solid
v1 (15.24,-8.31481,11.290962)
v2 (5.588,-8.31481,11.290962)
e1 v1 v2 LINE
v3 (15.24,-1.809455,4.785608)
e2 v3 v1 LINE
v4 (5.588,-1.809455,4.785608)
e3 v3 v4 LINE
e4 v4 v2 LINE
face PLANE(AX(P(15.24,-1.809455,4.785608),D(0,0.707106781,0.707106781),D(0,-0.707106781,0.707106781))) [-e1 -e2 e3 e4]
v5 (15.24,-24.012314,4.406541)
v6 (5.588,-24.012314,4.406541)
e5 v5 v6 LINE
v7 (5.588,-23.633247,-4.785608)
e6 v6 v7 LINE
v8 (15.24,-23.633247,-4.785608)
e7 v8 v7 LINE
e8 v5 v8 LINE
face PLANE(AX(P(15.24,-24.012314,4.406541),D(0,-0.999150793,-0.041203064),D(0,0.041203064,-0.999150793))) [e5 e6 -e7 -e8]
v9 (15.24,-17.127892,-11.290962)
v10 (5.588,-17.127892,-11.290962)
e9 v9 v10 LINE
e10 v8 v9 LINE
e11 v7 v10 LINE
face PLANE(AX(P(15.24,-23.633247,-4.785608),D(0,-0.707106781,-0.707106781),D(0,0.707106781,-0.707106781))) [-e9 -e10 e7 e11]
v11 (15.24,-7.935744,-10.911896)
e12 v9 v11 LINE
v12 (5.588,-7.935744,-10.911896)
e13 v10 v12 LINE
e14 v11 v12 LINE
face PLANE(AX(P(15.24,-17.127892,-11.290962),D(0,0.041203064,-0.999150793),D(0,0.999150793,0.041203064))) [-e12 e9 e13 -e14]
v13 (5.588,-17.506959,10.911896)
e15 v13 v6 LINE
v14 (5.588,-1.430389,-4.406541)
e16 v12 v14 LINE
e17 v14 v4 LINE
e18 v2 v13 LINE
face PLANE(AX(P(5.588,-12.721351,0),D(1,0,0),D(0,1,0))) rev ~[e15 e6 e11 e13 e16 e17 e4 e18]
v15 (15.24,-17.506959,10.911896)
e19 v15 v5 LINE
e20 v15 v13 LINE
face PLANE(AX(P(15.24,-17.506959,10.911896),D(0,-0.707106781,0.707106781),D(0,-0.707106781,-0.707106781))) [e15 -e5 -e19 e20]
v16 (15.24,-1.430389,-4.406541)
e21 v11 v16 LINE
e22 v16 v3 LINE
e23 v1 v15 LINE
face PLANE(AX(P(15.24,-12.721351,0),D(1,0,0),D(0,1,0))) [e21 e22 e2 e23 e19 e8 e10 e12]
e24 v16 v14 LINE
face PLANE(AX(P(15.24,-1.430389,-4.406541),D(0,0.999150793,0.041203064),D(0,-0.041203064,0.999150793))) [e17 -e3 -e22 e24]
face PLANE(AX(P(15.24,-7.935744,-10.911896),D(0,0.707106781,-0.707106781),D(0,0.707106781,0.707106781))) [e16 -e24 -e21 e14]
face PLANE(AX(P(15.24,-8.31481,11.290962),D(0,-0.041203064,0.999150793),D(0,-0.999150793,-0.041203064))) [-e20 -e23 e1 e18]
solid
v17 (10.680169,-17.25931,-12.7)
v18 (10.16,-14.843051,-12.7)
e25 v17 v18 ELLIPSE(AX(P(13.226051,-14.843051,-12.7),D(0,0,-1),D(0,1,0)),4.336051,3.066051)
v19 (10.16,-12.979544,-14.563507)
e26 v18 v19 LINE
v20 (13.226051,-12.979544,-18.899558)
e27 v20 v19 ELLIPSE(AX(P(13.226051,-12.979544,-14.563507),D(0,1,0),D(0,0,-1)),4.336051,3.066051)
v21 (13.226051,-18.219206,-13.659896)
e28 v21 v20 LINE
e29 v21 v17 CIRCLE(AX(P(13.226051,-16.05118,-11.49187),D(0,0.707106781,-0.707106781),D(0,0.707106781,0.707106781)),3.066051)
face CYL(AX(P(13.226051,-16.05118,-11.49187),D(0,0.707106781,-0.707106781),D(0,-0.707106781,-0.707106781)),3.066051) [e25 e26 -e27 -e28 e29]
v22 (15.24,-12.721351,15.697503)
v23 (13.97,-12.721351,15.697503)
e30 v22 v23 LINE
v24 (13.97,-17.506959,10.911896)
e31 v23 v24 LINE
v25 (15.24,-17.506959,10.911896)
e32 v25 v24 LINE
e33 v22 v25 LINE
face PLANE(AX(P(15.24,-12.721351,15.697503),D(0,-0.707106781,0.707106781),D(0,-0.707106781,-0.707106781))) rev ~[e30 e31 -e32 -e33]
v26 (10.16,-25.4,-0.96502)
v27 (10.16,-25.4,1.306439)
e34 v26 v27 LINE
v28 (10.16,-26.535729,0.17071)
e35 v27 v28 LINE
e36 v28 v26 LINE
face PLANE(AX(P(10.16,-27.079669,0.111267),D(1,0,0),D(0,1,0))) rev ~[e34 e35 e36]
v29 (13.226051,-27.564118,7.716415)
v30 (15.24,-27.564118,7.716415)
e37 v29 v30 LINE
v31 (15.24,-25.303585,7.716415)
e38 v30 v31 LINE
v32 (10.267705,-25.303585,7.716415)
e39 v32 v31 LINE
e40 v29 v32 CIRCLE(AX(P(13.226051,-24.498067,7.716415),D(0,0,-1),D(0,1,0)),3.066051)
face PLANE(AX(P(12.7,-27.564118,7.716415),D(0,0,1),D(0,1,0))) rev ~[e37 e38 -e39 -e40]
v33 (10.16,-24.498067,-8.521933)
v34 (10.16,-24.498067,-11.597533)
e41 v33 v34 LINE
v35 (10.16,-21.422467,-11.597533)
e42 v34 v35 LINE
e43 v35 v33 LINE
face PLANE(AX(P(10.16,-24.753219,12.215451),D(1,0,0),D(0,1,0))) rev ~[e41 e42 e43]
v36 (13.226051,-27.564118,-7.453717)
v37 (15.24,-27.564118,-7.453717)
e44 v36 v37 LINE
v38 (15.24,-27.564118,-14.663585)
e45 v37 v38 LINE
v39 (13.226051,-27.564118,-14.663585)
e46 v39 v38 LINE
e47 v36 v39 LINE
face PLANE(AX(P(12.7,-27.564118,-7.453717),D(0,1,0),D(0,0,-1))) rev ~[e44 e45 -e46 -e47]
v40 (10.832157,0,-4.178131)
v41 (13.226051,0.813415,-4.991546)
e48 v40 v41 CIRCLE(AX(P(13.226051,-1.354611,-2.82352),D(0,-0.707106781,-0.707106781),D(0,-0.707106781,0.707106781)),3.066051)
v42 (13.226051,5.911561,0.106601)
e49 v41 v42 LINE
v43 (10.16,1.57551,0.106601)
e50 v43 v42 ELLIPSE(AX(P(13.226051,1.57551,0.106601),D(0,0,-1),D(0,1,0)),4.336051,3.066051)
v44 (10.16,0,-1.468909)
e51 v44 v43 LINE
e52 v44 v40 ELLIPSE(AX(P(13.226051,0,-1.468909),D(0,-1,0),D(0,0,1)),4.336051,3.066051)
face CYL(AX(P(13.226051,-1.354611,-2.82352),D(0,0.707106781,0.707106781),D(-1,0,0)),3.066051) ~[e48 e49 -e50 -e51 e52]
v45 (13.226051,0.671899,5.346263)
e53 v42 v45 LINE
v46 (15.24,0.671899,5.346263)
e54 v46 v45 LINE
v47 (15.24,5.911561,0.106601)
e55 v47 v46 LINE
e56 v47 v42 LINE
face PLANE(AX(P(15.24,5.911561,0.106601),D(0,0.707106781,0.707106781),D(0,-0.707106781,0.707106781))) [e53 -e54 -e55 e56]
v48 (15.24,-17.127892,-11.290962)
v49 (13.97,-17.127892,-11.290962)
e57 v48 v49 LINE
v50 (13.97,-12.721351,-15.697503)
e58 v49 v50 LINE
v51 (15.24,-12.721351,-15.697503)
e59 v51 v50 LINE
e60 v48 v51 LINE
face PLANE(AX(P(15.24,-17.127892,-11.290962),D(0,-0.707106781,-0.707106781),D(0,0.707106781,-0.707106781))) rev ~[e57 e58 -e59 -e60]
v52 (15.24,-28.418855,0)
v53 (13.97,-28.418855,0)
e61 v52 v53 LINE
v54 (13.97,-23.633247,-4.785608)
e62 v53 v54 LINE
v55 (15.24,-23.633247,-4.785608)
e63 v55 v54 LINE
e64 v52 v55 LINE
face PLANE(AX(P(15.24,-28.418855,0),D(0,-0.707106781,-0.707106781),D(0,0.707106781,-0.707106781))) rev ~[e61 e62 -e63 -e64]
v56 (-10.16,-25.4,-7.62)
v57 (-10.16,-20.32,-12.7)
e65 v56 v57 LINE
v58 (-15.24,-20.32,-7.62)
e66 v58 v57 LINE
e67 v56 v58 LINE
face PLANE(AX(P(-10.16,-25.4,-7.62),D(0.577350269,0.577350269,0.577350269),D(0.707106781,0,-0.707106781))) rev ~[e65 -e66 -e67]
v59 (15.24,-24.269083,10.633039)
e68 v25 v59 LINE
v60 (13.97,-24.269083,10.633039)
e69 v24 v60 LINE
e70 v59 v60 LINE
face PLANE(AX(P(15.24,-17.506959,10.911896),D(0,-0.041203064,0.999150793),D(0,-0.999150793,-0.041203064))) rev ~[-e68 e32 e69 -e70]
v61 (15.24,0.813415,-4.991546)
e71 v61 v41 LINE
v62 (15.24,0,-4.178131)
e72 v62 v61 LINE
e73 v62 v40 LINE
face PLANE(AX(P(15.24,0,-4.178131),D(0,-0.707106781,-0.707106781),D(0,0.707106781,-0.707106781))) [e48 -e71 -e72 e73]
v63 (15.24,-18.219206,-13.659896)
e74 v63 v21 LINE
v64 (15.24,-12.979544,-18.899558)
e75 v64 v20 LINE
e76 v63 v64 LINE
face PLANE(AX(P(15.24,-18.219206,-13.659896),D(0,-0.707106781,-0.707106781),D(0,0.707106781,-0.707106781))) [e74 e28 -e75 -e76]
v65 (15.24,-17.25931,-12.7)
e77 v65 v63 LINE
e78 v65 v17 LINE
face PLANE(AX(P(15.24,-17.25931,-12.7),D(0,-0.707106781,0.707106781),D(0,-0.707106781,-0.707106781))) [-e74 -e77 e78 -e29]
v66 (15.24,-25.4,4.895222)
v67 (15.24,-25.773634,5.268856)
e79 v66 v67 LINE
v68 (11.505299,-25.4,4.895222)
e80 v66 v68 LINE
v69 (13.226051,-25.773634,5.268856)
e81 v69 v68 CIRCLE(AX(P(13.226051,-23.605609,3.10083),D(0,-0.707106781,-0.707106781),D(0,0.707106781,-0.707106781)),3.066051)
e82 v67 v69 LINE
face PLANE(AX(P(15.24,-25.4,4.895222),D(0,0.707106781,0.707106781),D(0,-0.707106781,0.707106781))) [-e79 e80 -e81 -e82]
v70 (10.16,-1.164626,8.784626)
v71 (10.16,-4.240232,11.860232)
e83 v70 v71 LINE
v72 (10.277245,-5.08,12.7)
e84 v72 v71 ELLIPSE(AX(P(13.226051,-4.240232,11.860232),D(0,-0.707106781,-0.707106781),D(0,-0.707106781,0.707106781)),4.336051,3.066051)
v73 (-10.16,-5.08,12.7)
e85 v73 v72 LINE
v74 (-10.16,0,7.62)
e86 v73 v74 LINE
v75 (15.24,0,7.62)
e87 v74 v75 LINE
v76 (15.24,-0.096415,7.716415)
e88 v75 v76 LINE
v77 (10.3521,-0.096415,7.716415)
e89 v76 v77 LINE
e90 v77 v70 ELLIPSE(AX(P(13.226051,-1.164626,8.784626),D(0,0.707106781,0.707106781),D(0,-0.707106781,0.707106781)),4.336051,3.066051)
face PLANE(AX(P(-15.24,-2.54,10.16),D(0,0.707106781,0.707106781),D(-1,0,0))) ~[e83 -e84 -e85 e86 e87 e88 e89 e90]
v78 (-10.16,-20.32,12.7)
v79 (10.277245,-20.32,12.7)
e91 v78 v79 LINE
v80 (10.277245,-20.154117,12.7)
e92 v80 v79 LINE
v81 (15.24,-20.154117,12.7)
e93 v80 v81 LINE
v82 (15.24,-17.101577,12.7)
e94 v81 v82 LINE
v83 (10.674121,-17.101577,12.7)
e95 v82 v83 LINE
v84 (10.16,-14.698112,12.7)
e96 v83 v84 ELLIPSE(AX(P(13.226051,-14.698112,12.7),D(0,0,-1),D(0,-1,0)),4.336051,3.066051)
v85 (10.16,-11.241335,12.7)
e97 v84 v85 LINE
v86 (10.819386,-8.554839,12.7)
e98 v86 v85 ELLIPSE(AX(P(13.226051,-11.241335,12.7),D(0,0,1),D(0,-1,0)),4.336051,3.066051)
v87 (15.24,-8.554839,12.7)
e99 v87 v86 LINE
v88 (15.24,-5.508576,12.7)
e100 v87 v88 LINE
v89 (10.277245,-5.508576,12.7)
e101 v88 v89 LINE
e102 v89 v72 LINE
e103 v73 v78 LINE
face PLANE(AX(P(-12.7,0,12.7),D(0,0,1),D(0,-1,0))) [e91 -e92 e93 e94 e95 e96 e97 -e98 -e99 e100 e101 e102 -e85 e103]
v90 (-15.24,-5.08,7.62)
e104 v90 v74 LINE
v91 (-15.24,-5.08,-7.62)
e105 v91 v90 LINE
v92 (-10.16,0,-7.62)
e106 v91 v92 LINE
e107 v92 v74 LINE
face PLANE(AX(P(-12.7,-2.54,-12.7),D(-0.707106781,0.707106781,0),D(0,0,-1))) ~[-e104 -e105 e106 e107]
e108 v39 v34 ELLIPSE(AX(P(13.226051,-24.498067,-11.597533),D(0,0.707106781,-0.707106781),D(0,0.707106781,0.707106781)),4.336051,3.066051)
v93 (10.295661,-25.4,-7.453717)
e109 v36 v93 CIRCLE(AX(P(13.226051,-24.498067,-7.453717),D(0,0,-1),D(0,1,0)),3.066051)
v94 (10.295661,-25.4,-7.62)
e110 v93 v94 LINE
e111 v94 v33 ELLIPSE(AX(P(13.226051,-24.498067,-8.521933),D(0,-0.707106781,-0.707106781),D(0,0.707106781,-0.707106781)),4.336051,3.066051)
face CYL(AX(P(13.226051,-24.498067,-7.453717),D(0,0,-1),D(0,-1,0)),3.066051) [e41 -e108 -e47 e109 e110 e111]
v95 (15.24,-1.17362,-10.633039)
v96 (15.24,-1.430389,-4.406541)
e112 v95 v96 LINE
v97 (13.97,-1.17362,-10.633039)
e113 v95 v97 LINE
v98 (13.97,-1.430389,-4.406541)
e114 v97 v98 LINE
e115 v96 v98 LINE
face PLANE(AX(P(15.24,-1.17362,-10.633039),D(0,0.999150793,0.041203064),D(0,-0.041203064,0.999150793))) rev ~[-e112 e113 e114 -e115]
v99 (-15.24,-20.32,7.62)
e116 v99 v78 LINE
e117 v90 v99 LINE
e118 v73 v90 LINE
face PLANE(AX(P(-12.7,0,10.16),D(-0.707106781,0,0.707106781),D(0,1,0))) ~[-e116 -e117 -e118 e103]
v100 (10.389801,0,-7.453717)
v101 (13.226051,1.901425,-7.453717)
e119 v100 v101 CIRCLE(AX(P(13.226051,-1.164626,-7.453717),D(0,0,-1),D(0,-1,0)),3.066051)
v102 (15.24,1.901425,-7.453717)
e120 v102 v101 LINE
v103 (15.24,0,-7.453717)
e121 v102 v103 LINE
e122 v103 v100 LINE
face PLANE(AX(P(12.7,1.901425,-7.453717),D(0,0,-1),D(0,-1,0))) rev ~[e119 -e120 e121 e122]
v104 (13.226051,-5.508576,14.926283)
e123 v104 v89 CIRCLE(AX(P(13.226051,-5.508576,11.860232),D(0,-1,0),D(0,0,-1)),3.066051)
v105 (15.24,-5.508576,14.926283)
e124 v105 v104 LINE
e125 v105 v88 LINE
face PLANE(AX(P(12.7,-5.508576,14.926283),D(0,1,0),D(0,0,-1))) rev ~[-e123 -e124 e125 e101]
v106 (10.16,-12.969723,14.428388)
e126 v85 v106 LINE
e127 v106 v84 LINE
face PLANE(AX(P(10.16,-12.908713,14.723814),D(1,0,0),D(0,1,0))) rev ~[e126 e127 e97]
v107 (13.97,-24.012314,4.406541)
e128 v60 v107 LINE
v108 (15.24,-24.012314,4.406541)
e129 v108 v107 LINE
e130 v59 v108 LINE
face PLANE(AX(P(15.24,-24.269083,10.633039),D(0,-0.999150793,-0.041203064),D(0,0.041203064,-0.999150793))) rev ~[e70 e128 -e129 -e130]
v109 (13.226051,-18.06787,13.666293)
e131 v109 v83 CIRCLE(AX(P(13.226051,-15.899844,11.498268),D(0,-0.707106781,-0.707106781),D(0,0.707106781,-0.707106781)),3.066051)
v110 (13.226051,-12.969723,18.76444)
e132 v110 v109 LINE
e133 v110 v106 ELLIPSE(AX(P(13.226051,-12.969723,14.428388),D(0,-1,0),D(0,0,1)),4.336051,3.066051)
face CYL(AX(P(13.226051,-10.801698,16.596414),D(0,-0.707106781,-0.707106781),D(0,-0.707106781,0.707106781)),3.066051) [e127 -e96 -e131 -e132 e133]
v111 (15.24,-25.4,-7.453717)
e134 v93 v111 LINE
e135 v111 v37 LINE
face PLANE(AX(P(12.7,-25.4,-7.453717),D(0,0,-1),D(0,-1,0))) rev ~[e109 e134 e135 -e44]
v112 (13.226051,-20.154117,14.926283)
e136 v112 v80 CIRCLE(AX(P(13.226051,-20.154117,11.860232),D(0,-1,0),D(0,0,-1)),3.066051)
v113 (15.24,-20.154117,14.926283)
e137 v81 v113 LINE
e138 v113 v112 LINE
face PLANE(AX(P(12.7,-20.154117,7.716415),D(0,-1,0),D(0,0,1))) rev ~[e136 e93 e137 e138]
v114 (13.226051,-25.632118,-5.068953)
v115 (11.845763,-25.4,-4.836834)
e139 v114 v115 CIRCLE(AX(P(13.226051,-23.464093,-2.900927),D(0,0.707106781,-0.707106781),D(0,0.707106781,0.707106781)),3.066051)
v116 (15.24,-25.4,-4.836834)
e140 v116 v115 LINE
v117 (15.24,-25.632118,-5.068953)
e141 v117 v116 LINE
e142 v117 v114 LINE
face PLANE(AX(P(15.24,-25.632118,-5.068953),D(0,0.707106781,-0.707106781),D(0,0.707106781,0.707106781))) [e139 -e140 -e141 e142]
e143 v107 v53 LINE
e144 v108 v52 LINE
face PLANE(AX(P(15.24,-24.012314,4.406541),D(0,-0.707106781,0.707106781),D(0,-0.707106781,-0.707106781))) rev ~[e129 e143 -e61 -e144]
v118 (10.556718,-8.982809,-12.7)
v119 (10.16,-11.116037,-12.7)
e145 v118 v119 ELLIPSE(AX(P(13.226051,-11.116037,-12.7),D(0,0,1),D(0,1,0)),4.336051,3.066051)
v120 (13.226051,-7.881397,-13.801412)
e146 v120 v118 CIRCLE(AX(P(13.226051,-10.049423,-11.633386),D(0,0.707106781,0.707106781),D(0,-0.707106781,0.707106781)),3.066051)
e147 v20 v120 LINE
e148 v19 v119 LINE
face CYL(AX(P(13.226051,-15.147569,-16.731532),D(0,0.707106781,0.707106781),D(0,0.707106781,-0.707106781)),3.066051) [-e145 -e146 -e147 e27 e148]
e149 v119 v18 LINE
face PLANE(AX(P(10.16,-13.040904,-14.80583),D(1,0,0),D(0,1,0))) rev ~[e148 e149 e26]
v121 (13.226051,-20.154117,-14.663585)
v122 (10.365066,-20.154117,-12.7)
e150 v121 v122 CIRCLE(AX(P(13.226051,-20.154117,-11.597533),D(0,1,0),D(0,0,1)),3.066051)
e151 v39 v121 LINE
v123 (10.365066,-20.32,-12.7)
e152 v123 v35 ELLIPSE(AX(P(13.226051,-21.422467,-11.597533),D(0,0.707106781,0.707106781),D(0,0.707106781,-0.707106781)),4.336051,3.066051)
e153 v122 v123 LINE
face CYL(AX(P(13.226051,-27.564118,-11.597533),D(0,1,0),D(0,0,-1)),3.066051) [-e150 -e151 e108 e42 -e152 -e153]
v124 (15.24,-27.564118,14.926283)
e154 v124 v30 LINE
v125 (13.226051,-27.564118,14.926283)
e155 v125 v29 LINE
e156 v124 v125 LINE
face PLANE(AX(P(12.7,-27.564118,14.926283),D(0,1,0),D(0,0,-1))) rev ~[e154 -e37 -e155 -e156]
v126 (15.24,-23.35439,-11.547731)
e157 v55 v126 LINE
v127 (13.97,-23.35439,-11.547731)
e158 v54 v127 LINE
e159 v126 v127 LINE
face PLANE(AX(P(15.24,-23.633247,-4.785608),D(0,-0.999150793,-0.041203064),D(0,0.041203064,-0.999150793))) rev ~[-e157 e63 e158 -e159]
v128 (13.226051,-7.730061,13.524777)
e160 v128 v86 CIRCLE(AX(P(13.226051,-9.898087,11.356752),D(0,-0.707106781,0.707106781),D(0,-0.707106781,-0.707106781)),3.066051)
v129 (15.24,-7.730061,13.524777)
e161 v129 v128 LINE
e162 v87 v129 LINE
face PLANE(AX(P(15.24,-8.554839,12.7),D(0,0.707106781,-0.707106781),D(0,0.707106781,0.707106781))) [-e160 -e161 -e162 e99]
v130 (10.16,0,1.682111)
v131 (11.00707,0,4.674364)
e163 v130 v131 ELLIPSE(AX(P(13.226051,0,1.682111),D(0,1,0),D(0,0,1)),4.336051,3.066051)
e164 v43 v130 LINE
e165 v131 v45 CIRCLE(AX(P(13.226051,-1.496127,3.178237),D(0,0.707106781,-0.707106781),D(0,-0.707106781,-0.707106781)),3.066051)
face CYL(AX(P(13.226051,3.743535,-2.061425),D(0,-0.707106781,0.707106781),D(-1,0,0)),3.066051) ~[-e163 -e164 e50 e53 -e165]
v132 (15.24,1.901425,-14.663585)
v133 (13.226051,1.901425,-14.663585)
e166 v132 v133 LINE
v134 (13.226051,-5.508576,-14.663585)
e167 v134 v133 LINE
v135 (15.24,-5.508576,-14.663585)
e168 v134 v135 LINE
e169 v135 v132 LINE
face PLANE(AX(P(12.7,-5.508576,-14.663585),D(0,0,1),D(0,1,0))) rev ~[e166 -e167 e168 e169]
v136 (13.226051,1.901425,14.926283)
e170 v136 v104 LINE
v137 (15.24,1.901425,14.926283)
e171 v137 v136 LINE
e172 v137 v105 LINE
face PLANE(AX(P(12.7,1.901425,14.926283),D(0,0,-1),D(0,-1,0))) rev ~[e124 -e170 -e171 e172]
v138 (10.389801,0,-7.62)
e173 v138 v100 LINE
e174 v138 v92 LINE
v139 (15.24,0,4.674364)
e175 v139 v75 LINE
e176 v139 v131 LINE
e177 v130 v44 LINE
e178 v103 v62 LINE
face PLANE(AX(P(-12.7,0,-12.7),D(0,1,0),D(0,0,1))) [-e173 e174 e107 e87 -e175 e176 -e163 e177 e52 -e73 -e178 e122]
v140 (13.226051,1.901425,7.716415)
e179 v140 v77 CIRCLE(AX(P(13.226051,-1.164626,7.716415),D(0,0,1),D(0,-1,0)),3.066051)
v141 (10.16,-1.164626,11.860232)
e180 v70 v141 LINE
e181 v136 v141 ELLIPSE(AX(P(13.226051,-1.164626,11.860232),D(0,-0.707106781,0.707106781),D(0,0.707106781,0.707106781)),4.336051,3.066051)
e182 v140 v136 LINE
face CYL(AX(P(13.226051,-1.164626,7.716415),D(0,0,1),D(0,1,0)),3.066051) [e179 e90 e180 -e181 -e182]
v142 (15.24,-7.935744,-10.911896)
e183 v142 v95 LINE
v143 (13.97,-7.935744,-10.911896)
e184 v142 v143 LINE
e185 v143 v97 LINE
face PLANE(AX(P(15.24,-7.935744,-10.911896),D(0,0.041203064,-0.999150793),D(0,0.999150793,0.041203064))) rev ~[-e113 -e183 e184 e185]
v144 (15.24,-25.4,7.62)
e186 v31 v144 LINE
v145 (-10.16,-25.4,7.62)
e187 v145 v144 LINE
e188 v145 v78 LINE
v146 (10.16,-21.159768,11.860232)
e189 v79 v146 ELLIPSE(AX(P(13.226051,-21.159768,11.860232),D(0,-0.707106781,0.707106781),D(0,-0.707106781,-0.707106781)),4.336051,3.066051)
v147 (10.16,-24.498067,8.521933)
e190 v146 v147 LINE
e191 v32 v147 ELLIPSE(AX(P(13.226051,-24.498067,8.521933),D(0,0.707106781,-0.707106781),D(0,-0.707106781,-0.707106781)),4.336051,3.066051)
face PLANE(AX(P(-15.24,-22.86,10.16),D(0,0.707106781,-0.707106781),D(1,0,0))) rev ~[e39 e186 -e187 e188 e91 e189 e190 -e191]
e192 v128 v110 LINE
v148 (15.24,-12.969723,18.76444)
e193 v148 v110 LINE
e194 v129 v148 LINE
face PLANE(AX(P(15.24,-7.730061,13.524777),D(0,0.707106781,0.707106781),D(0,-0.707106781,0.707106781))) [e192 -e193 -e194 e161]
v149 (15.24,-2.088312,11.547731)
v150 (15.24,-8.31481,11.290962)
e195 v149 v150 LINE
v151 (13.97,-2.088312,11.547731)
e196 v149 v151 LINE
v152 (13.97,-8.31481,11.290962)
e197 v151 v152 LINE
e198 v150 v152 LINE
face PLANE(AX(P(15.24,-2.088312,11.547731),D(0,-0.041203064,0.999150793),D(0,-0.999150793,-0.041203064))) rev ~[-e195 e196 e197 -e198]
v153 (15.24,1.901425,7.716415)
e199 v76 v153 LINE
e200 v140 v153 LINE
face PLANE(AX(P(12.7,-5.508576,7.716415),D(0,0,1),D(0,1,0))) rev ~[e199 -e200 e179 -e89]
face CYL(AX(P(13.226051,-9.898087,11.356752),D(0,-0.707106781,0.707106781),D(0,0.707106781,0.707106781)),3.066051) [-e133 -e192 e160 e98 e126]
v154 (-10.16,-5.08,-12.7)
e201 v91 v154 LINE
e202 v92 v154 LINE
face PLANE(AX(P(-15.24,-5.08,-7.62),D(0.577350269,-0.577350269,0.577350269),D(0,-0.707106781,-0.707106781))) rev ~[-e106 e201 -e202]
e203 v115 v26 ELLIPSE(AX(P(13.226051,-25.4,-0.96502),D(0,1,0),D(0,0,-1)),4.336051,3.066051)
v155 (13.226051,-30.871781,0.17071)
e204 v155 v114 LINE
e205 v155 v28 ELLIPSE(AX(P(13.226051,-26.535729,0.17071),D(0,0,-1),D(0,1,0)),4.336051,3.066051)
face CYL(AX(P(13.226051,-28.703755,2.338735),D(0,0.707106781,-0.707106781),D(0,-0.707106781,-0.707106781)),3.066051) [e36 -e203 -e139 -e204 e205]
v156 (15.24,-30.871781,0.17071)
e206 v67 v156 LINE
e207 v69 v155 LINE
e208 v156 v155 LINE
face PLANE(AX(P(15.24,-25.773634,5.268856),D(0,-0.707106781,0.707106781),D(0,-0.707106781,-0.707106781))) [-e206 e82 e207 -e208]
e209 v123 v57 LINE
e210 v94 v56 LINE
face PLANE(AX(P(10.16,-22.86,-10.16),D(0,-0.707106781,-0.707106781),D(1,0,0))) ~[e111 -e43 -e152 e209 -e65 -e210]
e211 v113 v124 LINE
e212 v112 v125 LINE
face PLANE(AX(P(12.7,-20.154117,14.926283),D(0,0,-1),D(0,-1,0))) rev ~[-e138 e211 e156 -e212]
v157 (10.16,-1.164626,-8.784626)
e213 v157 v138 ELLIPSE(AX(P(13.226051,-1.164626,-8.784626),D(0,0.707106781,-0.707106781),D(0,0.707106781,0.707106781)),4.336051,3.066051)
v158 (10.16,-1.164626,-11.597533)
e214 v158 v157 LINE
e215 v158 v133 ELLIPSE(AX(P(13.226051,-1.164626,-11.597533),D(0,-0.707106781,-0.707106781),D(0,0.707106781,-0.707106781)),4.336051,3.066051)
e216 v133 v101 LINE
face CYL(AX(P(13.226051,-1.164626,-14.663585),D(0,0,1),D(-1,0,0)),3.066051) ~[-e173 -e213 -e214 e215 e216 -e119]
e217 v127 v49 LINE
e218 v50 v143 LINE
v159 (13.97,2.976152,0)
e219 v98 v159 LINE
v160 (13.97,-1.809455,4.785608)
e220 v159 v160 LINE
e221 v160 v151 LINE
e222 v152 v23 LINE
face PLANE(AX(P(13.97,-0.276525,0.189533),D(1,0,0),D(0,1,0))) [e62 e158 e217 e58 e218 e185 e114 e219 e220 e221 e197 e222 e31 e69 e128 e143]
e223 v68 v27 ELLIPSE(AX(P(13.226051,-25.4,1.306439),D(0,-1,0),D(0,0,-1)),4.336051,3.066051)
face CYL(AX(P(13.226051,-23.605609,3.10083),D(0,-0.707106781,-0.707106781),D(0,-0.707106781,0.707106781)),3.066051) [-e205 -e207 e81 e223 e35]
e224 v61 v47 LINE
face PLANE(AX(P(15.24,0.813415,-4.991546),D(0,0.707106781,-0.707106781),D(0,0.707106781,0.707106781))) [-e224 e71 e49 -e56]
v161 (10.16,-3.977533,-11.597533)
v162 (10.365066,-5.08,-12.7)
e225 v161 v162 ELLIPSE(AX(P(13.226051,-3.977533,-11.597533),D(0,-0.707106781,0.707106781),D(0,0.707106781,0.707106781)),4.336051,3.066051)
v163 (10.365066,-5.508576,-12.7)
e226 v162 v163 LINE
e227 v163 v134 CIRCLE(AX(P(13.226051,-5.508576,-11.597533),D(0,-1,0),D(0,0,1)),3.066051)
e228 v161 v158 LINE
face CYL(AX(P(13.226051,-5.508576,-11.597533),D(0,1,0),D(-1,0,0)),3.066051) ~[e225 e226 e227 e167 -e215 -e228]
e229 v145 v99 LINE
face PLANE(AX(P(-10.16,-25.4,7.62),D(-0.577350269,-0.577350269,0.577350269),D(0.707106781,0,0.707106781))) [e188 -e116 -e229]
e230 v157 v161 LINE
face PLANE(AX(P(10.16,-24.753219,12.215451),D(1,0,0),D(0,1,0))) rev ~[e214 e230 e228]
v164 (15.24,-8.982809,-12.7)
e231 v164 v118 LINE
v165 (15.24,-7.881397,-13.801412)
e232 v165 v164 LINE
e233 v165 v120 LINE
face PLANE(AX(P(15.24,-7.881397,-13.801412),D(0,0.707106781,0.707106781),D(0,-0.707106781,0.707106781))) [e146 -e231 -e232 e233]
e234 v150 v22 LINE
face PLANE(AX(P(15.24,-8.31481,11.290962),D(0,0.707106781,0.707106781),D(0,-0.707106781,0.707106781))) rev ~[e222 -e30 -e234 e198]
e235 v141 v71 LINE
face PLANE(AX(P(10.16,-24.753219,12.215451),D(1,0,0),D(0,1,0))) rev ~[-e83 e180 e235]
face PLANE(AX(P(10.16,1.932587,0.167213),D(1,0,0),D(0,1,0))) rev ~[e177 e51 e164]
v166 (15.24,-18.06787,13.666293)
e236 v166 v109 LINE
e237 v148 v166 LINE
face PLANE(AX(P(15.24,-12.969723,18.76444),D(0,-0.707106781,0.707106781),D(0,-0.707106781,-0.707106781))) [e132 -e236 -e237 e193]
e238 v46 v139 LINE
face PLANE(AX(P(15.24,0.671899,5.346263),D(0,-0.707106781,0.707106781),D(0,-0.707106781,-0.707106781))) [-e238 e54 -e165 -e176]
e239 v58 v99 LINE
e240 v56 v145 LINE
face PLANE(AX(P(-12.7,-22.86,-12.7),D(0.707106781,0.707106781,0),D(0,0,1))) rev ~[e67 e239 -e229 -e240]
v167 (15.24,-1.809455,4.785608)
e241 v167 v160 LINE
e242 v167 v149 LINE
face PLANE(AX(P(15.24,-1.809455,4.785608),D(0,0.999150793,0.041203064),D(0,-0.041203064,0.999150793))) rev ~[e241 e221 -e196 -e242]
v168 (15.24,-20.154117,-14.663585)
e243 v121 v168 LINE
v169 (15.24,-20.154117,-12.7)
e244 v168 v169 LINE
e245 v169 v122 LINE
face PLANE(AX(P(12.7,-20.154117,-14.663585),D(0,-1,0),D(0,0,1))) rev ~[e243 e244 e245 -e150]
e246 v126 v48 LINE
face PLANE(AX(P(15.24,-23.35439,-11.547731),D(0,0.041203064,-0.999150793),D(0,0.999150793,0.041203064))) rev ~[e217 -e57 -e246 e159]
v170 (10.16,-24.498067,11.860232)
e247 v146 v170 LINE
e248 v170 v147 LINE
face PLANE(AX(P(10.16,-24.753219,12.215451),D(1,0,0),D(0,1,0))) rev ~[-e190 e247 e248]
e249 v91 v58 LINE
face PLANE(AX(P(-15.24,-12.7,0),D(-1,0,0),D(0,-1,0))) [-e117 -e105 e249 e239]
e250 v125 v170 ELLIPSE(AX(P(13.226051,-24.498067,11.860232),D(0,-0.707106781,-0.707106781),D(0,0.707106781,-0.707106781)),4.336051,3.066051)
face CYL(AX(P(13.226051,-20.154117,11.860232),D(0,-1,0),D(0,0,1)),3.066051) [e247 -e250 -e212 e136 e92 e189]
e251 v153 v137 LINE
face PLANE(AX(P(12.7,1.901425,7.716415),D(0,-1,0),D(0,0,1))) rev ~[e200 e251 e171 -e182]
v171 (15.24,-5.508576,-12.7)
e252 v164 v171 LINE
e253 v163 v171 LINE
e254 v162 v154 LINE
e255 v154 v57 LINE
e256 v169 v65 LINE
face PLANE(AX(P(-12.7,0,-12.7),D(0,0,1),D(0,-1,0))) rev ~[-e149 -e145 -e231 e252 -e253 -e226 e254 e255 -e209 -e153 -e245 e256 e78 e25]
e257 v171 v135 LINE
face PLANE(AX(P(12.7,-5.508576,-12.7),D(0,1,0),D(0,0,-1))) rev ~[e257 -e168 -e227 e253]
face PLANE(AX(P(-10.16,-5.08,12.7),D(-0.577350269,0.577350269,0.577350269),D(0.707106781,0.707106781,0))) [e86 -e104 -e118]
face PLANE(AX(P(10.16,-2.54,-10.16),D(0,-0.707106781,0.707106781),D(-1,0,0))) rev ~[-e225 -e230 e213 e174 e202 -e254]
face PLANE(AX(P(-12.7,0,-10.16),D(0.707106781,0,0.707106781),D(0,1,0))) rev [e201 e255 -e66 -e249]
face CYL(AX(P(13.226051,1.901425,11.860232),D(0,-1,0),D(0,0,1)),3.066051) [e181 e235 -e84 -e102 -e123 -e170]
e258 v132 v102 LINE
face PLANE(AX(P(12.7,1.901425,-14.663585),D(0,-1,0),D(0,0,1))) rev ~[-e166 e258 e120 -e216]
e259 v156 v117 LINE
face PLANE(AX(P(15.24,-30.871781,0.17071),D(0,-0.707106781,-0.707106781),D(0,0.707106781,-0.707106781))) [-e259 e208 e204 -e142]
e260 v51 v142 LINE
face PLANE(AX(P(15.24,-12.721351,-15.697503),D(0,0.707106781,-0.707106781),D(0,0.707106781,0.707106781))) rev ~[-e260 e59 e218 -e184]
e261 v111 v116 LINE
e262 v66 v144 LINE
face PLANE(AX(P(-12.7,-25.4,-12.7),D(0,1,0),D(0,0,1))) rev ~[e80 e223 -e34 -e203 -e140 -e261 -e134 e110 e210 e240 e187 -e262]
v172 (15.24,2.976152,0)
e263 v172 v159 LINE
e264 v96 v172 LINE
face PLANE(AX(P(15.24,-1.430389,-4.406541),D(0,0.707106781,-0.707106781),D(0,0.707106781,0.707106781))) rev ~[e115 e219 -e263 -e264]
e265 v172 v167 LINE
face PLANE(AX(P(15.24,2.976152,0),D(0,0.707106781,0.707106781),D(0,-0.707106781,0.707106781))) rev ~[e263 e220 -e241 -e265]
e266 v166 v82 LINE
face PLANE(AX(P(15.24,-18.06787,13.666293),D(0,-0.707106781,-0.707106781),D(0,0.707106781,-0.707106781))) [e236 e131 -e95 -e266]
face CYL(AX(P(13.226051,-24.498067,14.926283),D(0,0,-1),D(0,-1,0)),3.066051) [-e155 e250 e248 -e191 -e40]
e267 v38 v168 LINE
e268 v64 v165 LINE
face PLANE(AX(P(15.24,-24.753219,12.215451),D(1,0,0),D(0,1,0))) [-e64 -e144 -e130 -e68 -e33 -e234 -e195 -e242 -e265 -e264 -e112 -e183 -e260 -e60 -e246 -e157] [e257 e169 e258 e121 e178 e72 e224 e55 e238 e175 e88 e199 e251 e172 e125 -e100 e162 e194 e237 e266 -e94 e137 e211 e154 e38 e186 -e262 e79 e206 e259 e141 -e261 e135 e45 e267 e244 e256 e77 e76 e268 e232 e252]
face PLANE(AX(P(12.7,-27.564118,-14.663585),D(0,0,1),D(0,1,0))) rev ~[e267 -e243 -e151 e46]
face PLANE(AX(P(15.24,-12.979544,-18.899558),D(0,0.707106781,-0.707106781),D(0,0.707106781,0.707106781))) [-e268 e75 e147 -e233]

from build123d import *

# Parameters (mm, degrees)
F0_W       = 25.4
F0_H       = 25.4
F1_DEPTH   = 25.4
F2_W       = 5.2458834782
F2_H       = 4.983584857
F2_W_2     = 5.5085764325
F2_H_2     = 5.2462833226
F1_FACE_W  = 25.4
F1_FACE_H  = 25.4
F1_FACE1_W = 25.4
F1_FACE1_H = 25.4
F3_DEPTH   = 2.54
F5_DEPTH   = 5.08
F6_SIZE    = 5.08
F7_R       = 3.0660512242
F9_DEPTH   = 1.27
F10_DEPTH  = 9.652


# Not quite as in the source:
# - a feature names something its author has since deleted; it is built from what else it names


with BuildPart() as f1:
    # F0 (on Front) → F1 (new body)
    with BuildSketch(Plane.XZ):
        Rectangle(F0_W, F0_H)
    extrude(amount=F1_DEPTH)

    # F2 (on face) + F1_face (on face) + F1_face1 (on face) → F3 (join, symmetric)
    with BuildSketch(Plane.YZ.offset(12.7)):
        Polygon((-27.5641178384, 14.9262829959), (-27.5641178384, 7.716415143), (-25.4, 7.716415143), (-25.4, 12.7), (-20.1541165218, 12.7), (-20.1541165218, 14.9262829959), align=None)
        with Locations((-22.7770582609, 10.2082075715)):
            Rectangle(F2_W, F2_H)
        with Locations((-2.7542882162, 10.2082075715)):
            Rectangle(F2_W_2, F2_H)
        Polygon((-5.5085764325, 14.9262829959), (-5.5085764325, 12.7), (0, 12.7), (0, 7.716415143), (1.9014248842, 7.716415143), (1.9014248842, 14.9262829959), align=None)
        Polygon((0, -12.7), (-5.5085764325, -12.7), (-5.5085764325, -14.6635845304), (1.9014248842, -14.6635845304), (1.9014248842, -7.4537166774), (0, -7.4537166774), align=None)
        Polygon((-25.4, -12.7), (-25.4, -7.4537166774), (-27.5641178384, -7.4537166774), (-27.5641178384, -14.6635845304), (-20.1541165218, -14.6635845304), (-20.1541165218, -12.7), align=None)
        with Locations((-2.7542882162, -10.0768583387)):
            Rectangle(F2_W_2, F2_H_2)
    with BuildSketch(Plane(origin=(12.7, -12.7, 0), x_dir=(0, 1, 0), z_dir=(1, 0, 0))):
        Rectangle(F1_FACE_W, F1_FACE_H)
    with BuildSketch(Plane(origin=(-12.7, -12.7, 0), x_dir=(0, -1, 0), z_dir=(-1, 0, 0))):
        Rectangle(F1_FACE1_W, F1_FACE1_H)
    extrude(amount=F3_DEPTH, both=True, dir=(1, 0, 0))

    # F4 (on face) → F5 (join)
    with BuildSketch(Plane.YZ.offset(15.24)):
        Polygon((-12.9697233272, 18.7644396144), (-18.0678697774, 13.6662931641), (-17.1015766133, 12.7), (-8.5548385823, 12.7), (-7.7300611476, 13.5247774348), align=None)
        Polygon((0.6718987712, 5.3462631056), (0, 4.6743643344), (0, -4.1781310237), (0.8134145006, -4.9915455243), (5.9115609509, 0.106600926), align=None)
        Polygon((-8.9828089794, -12.7), (-17.2593100241, -12.7), (-18.219205952, -13.6598959279), (-12.9795437724, -18.8995581075), (-7.8813973221, -13.8014116573), align=None)
        Polygon((-25.4, -4.8368342047), (-25.4, 4.8952218766), (-25.773634139, 5.2688560155), (-30.8717805892, 0.1707095653), (-25.6321184096, -5.0689526143), align=None)
    extrude(amount=-F5_DEPTH)

    # F6
    f6_edges = [f1.edges().sort_by_distance(p)[0] for p in [
        (-2.54, 0, -12.7),
        (-15.24, 0, 0),
        (-15.24, -12.7, 12.7),
        (-15.24, -12.7, -12.7),
        (-15.24, -25.4, 0),
        (-2.54, -25.4, 12.7),
        (-2.54, -25.4, -12.7),
        (-2.54, 0, 12.7),
    ]]
    chamfer(f6_edges, length=F6_SIZE)

    # F7
    f7_edges = [f1.edges().sort_by_distance(p)[0] for p in [
        (10.16, -15.599375, -16.279727),
        (10.16, -10.430471, -16.350485),
        (10.16, -1.803576, -14.663585),
        (10.16, 1.901425, -11.058651),
        (10.16, -23.859117, -14.663585),
        (10.16, -27.564118, -11.058651),
        (10.16, -28.251949, -2.449122),
        (10.16, -28.322707, 2.719783),
        (10.16, -27.564118, 11.321349),
        (10.16, -23.859117, 14.926283),
        (10.16, 3.362488, -2.442472),
        (10.16, 3.29173, 2.726432),
        (10.16, 1.901425, 11.321349),
        (10.16, -1.803576, 14.926283),
        (10.16, -10.349892, 16.144609),
        (10.16, -15.518797, 16.215366),
    ]]
    fillet(f7_edges, radius=F7_R)

    # F8 (on face) → F9 (cut)
    with BuildSketch(Plane.YZ.offset(15.24)):
        Polygon((-1.4303888491, -4.4065409636), (2.9761521146, 0), (-1.8094554409, 4.7856075555), align=None)
        Polygon((-1.1736200056, -10.6330388789), (-1.4303888491, -4.4065409636), (-7.9357437924, -10.911895907), align=None)
        Polygon((-7.9357437924, -10.911895907), (-1.4303888491, -4.4065409636), (-1.8094554409, 4.7856075555), (-8.3148103842, 11.2909624988), (-17.5069589033, 10.911895907), (-24.0123138467, 4.4065409636), (-23.6332472548, -4.7856075555), (-17.1278923115, -11.2909624988), align=None)
        Polygon((-8.3148103842, 11.2909624988), (-1.8094554409, 4.7856075555), (-2.0883124689, 11.5477313422), align=None)
        Polygon((-12.7213513479, -15.6975034624), (-7.9357437924, -10.911895907), (-17.1278923115, -11.2909624988), align=None)
        Polygon((-17.5069589033, 10.911895907), (-8.3148103842, 11.2909624988), (-12.7213513479, 15.6975034624), align=None)
        Polygon((-23.3543902268, -11.5477313422), (-17.1278923115, -11.2909624988), (-23.6332472548, -4.7856075555), align=None)
        Polygon((-24.0123138467, 4.4065409636), (-17.5069589033, 10.911895907), (-24.2690826901, 10.6330388789), align=None)
        Polygon((-28.4188548103, 0), (-23.6332472548, -4.7856075555), (-24.0123138467, 4.4065409636), align=None)
    extrude(amount=-F9_DEPTH, mode=Mode.SUBTRACT)


with BuildPart() as f10:
    # F8 (on face) → F10 (new body)
    with BuildSketch(Plane.YZ.offset(15.24)):
        Polygon((-7.9357437924, -10.911895907), (-1.4303888491, -4.4065409636), (-1.8094554409, 4.7856075555), (-8.3148103842, 11.2909624988), (-17.5069589033, 10.911895907), (-24.0123138467, 4.4065409636), (-23.6332472548, -4.7856075555), (-17.1278923115, -11.2909624988), align=None)
    extrude(amount=-F10_DEPTH)


solid = Compound([f1.part, f10.part])
